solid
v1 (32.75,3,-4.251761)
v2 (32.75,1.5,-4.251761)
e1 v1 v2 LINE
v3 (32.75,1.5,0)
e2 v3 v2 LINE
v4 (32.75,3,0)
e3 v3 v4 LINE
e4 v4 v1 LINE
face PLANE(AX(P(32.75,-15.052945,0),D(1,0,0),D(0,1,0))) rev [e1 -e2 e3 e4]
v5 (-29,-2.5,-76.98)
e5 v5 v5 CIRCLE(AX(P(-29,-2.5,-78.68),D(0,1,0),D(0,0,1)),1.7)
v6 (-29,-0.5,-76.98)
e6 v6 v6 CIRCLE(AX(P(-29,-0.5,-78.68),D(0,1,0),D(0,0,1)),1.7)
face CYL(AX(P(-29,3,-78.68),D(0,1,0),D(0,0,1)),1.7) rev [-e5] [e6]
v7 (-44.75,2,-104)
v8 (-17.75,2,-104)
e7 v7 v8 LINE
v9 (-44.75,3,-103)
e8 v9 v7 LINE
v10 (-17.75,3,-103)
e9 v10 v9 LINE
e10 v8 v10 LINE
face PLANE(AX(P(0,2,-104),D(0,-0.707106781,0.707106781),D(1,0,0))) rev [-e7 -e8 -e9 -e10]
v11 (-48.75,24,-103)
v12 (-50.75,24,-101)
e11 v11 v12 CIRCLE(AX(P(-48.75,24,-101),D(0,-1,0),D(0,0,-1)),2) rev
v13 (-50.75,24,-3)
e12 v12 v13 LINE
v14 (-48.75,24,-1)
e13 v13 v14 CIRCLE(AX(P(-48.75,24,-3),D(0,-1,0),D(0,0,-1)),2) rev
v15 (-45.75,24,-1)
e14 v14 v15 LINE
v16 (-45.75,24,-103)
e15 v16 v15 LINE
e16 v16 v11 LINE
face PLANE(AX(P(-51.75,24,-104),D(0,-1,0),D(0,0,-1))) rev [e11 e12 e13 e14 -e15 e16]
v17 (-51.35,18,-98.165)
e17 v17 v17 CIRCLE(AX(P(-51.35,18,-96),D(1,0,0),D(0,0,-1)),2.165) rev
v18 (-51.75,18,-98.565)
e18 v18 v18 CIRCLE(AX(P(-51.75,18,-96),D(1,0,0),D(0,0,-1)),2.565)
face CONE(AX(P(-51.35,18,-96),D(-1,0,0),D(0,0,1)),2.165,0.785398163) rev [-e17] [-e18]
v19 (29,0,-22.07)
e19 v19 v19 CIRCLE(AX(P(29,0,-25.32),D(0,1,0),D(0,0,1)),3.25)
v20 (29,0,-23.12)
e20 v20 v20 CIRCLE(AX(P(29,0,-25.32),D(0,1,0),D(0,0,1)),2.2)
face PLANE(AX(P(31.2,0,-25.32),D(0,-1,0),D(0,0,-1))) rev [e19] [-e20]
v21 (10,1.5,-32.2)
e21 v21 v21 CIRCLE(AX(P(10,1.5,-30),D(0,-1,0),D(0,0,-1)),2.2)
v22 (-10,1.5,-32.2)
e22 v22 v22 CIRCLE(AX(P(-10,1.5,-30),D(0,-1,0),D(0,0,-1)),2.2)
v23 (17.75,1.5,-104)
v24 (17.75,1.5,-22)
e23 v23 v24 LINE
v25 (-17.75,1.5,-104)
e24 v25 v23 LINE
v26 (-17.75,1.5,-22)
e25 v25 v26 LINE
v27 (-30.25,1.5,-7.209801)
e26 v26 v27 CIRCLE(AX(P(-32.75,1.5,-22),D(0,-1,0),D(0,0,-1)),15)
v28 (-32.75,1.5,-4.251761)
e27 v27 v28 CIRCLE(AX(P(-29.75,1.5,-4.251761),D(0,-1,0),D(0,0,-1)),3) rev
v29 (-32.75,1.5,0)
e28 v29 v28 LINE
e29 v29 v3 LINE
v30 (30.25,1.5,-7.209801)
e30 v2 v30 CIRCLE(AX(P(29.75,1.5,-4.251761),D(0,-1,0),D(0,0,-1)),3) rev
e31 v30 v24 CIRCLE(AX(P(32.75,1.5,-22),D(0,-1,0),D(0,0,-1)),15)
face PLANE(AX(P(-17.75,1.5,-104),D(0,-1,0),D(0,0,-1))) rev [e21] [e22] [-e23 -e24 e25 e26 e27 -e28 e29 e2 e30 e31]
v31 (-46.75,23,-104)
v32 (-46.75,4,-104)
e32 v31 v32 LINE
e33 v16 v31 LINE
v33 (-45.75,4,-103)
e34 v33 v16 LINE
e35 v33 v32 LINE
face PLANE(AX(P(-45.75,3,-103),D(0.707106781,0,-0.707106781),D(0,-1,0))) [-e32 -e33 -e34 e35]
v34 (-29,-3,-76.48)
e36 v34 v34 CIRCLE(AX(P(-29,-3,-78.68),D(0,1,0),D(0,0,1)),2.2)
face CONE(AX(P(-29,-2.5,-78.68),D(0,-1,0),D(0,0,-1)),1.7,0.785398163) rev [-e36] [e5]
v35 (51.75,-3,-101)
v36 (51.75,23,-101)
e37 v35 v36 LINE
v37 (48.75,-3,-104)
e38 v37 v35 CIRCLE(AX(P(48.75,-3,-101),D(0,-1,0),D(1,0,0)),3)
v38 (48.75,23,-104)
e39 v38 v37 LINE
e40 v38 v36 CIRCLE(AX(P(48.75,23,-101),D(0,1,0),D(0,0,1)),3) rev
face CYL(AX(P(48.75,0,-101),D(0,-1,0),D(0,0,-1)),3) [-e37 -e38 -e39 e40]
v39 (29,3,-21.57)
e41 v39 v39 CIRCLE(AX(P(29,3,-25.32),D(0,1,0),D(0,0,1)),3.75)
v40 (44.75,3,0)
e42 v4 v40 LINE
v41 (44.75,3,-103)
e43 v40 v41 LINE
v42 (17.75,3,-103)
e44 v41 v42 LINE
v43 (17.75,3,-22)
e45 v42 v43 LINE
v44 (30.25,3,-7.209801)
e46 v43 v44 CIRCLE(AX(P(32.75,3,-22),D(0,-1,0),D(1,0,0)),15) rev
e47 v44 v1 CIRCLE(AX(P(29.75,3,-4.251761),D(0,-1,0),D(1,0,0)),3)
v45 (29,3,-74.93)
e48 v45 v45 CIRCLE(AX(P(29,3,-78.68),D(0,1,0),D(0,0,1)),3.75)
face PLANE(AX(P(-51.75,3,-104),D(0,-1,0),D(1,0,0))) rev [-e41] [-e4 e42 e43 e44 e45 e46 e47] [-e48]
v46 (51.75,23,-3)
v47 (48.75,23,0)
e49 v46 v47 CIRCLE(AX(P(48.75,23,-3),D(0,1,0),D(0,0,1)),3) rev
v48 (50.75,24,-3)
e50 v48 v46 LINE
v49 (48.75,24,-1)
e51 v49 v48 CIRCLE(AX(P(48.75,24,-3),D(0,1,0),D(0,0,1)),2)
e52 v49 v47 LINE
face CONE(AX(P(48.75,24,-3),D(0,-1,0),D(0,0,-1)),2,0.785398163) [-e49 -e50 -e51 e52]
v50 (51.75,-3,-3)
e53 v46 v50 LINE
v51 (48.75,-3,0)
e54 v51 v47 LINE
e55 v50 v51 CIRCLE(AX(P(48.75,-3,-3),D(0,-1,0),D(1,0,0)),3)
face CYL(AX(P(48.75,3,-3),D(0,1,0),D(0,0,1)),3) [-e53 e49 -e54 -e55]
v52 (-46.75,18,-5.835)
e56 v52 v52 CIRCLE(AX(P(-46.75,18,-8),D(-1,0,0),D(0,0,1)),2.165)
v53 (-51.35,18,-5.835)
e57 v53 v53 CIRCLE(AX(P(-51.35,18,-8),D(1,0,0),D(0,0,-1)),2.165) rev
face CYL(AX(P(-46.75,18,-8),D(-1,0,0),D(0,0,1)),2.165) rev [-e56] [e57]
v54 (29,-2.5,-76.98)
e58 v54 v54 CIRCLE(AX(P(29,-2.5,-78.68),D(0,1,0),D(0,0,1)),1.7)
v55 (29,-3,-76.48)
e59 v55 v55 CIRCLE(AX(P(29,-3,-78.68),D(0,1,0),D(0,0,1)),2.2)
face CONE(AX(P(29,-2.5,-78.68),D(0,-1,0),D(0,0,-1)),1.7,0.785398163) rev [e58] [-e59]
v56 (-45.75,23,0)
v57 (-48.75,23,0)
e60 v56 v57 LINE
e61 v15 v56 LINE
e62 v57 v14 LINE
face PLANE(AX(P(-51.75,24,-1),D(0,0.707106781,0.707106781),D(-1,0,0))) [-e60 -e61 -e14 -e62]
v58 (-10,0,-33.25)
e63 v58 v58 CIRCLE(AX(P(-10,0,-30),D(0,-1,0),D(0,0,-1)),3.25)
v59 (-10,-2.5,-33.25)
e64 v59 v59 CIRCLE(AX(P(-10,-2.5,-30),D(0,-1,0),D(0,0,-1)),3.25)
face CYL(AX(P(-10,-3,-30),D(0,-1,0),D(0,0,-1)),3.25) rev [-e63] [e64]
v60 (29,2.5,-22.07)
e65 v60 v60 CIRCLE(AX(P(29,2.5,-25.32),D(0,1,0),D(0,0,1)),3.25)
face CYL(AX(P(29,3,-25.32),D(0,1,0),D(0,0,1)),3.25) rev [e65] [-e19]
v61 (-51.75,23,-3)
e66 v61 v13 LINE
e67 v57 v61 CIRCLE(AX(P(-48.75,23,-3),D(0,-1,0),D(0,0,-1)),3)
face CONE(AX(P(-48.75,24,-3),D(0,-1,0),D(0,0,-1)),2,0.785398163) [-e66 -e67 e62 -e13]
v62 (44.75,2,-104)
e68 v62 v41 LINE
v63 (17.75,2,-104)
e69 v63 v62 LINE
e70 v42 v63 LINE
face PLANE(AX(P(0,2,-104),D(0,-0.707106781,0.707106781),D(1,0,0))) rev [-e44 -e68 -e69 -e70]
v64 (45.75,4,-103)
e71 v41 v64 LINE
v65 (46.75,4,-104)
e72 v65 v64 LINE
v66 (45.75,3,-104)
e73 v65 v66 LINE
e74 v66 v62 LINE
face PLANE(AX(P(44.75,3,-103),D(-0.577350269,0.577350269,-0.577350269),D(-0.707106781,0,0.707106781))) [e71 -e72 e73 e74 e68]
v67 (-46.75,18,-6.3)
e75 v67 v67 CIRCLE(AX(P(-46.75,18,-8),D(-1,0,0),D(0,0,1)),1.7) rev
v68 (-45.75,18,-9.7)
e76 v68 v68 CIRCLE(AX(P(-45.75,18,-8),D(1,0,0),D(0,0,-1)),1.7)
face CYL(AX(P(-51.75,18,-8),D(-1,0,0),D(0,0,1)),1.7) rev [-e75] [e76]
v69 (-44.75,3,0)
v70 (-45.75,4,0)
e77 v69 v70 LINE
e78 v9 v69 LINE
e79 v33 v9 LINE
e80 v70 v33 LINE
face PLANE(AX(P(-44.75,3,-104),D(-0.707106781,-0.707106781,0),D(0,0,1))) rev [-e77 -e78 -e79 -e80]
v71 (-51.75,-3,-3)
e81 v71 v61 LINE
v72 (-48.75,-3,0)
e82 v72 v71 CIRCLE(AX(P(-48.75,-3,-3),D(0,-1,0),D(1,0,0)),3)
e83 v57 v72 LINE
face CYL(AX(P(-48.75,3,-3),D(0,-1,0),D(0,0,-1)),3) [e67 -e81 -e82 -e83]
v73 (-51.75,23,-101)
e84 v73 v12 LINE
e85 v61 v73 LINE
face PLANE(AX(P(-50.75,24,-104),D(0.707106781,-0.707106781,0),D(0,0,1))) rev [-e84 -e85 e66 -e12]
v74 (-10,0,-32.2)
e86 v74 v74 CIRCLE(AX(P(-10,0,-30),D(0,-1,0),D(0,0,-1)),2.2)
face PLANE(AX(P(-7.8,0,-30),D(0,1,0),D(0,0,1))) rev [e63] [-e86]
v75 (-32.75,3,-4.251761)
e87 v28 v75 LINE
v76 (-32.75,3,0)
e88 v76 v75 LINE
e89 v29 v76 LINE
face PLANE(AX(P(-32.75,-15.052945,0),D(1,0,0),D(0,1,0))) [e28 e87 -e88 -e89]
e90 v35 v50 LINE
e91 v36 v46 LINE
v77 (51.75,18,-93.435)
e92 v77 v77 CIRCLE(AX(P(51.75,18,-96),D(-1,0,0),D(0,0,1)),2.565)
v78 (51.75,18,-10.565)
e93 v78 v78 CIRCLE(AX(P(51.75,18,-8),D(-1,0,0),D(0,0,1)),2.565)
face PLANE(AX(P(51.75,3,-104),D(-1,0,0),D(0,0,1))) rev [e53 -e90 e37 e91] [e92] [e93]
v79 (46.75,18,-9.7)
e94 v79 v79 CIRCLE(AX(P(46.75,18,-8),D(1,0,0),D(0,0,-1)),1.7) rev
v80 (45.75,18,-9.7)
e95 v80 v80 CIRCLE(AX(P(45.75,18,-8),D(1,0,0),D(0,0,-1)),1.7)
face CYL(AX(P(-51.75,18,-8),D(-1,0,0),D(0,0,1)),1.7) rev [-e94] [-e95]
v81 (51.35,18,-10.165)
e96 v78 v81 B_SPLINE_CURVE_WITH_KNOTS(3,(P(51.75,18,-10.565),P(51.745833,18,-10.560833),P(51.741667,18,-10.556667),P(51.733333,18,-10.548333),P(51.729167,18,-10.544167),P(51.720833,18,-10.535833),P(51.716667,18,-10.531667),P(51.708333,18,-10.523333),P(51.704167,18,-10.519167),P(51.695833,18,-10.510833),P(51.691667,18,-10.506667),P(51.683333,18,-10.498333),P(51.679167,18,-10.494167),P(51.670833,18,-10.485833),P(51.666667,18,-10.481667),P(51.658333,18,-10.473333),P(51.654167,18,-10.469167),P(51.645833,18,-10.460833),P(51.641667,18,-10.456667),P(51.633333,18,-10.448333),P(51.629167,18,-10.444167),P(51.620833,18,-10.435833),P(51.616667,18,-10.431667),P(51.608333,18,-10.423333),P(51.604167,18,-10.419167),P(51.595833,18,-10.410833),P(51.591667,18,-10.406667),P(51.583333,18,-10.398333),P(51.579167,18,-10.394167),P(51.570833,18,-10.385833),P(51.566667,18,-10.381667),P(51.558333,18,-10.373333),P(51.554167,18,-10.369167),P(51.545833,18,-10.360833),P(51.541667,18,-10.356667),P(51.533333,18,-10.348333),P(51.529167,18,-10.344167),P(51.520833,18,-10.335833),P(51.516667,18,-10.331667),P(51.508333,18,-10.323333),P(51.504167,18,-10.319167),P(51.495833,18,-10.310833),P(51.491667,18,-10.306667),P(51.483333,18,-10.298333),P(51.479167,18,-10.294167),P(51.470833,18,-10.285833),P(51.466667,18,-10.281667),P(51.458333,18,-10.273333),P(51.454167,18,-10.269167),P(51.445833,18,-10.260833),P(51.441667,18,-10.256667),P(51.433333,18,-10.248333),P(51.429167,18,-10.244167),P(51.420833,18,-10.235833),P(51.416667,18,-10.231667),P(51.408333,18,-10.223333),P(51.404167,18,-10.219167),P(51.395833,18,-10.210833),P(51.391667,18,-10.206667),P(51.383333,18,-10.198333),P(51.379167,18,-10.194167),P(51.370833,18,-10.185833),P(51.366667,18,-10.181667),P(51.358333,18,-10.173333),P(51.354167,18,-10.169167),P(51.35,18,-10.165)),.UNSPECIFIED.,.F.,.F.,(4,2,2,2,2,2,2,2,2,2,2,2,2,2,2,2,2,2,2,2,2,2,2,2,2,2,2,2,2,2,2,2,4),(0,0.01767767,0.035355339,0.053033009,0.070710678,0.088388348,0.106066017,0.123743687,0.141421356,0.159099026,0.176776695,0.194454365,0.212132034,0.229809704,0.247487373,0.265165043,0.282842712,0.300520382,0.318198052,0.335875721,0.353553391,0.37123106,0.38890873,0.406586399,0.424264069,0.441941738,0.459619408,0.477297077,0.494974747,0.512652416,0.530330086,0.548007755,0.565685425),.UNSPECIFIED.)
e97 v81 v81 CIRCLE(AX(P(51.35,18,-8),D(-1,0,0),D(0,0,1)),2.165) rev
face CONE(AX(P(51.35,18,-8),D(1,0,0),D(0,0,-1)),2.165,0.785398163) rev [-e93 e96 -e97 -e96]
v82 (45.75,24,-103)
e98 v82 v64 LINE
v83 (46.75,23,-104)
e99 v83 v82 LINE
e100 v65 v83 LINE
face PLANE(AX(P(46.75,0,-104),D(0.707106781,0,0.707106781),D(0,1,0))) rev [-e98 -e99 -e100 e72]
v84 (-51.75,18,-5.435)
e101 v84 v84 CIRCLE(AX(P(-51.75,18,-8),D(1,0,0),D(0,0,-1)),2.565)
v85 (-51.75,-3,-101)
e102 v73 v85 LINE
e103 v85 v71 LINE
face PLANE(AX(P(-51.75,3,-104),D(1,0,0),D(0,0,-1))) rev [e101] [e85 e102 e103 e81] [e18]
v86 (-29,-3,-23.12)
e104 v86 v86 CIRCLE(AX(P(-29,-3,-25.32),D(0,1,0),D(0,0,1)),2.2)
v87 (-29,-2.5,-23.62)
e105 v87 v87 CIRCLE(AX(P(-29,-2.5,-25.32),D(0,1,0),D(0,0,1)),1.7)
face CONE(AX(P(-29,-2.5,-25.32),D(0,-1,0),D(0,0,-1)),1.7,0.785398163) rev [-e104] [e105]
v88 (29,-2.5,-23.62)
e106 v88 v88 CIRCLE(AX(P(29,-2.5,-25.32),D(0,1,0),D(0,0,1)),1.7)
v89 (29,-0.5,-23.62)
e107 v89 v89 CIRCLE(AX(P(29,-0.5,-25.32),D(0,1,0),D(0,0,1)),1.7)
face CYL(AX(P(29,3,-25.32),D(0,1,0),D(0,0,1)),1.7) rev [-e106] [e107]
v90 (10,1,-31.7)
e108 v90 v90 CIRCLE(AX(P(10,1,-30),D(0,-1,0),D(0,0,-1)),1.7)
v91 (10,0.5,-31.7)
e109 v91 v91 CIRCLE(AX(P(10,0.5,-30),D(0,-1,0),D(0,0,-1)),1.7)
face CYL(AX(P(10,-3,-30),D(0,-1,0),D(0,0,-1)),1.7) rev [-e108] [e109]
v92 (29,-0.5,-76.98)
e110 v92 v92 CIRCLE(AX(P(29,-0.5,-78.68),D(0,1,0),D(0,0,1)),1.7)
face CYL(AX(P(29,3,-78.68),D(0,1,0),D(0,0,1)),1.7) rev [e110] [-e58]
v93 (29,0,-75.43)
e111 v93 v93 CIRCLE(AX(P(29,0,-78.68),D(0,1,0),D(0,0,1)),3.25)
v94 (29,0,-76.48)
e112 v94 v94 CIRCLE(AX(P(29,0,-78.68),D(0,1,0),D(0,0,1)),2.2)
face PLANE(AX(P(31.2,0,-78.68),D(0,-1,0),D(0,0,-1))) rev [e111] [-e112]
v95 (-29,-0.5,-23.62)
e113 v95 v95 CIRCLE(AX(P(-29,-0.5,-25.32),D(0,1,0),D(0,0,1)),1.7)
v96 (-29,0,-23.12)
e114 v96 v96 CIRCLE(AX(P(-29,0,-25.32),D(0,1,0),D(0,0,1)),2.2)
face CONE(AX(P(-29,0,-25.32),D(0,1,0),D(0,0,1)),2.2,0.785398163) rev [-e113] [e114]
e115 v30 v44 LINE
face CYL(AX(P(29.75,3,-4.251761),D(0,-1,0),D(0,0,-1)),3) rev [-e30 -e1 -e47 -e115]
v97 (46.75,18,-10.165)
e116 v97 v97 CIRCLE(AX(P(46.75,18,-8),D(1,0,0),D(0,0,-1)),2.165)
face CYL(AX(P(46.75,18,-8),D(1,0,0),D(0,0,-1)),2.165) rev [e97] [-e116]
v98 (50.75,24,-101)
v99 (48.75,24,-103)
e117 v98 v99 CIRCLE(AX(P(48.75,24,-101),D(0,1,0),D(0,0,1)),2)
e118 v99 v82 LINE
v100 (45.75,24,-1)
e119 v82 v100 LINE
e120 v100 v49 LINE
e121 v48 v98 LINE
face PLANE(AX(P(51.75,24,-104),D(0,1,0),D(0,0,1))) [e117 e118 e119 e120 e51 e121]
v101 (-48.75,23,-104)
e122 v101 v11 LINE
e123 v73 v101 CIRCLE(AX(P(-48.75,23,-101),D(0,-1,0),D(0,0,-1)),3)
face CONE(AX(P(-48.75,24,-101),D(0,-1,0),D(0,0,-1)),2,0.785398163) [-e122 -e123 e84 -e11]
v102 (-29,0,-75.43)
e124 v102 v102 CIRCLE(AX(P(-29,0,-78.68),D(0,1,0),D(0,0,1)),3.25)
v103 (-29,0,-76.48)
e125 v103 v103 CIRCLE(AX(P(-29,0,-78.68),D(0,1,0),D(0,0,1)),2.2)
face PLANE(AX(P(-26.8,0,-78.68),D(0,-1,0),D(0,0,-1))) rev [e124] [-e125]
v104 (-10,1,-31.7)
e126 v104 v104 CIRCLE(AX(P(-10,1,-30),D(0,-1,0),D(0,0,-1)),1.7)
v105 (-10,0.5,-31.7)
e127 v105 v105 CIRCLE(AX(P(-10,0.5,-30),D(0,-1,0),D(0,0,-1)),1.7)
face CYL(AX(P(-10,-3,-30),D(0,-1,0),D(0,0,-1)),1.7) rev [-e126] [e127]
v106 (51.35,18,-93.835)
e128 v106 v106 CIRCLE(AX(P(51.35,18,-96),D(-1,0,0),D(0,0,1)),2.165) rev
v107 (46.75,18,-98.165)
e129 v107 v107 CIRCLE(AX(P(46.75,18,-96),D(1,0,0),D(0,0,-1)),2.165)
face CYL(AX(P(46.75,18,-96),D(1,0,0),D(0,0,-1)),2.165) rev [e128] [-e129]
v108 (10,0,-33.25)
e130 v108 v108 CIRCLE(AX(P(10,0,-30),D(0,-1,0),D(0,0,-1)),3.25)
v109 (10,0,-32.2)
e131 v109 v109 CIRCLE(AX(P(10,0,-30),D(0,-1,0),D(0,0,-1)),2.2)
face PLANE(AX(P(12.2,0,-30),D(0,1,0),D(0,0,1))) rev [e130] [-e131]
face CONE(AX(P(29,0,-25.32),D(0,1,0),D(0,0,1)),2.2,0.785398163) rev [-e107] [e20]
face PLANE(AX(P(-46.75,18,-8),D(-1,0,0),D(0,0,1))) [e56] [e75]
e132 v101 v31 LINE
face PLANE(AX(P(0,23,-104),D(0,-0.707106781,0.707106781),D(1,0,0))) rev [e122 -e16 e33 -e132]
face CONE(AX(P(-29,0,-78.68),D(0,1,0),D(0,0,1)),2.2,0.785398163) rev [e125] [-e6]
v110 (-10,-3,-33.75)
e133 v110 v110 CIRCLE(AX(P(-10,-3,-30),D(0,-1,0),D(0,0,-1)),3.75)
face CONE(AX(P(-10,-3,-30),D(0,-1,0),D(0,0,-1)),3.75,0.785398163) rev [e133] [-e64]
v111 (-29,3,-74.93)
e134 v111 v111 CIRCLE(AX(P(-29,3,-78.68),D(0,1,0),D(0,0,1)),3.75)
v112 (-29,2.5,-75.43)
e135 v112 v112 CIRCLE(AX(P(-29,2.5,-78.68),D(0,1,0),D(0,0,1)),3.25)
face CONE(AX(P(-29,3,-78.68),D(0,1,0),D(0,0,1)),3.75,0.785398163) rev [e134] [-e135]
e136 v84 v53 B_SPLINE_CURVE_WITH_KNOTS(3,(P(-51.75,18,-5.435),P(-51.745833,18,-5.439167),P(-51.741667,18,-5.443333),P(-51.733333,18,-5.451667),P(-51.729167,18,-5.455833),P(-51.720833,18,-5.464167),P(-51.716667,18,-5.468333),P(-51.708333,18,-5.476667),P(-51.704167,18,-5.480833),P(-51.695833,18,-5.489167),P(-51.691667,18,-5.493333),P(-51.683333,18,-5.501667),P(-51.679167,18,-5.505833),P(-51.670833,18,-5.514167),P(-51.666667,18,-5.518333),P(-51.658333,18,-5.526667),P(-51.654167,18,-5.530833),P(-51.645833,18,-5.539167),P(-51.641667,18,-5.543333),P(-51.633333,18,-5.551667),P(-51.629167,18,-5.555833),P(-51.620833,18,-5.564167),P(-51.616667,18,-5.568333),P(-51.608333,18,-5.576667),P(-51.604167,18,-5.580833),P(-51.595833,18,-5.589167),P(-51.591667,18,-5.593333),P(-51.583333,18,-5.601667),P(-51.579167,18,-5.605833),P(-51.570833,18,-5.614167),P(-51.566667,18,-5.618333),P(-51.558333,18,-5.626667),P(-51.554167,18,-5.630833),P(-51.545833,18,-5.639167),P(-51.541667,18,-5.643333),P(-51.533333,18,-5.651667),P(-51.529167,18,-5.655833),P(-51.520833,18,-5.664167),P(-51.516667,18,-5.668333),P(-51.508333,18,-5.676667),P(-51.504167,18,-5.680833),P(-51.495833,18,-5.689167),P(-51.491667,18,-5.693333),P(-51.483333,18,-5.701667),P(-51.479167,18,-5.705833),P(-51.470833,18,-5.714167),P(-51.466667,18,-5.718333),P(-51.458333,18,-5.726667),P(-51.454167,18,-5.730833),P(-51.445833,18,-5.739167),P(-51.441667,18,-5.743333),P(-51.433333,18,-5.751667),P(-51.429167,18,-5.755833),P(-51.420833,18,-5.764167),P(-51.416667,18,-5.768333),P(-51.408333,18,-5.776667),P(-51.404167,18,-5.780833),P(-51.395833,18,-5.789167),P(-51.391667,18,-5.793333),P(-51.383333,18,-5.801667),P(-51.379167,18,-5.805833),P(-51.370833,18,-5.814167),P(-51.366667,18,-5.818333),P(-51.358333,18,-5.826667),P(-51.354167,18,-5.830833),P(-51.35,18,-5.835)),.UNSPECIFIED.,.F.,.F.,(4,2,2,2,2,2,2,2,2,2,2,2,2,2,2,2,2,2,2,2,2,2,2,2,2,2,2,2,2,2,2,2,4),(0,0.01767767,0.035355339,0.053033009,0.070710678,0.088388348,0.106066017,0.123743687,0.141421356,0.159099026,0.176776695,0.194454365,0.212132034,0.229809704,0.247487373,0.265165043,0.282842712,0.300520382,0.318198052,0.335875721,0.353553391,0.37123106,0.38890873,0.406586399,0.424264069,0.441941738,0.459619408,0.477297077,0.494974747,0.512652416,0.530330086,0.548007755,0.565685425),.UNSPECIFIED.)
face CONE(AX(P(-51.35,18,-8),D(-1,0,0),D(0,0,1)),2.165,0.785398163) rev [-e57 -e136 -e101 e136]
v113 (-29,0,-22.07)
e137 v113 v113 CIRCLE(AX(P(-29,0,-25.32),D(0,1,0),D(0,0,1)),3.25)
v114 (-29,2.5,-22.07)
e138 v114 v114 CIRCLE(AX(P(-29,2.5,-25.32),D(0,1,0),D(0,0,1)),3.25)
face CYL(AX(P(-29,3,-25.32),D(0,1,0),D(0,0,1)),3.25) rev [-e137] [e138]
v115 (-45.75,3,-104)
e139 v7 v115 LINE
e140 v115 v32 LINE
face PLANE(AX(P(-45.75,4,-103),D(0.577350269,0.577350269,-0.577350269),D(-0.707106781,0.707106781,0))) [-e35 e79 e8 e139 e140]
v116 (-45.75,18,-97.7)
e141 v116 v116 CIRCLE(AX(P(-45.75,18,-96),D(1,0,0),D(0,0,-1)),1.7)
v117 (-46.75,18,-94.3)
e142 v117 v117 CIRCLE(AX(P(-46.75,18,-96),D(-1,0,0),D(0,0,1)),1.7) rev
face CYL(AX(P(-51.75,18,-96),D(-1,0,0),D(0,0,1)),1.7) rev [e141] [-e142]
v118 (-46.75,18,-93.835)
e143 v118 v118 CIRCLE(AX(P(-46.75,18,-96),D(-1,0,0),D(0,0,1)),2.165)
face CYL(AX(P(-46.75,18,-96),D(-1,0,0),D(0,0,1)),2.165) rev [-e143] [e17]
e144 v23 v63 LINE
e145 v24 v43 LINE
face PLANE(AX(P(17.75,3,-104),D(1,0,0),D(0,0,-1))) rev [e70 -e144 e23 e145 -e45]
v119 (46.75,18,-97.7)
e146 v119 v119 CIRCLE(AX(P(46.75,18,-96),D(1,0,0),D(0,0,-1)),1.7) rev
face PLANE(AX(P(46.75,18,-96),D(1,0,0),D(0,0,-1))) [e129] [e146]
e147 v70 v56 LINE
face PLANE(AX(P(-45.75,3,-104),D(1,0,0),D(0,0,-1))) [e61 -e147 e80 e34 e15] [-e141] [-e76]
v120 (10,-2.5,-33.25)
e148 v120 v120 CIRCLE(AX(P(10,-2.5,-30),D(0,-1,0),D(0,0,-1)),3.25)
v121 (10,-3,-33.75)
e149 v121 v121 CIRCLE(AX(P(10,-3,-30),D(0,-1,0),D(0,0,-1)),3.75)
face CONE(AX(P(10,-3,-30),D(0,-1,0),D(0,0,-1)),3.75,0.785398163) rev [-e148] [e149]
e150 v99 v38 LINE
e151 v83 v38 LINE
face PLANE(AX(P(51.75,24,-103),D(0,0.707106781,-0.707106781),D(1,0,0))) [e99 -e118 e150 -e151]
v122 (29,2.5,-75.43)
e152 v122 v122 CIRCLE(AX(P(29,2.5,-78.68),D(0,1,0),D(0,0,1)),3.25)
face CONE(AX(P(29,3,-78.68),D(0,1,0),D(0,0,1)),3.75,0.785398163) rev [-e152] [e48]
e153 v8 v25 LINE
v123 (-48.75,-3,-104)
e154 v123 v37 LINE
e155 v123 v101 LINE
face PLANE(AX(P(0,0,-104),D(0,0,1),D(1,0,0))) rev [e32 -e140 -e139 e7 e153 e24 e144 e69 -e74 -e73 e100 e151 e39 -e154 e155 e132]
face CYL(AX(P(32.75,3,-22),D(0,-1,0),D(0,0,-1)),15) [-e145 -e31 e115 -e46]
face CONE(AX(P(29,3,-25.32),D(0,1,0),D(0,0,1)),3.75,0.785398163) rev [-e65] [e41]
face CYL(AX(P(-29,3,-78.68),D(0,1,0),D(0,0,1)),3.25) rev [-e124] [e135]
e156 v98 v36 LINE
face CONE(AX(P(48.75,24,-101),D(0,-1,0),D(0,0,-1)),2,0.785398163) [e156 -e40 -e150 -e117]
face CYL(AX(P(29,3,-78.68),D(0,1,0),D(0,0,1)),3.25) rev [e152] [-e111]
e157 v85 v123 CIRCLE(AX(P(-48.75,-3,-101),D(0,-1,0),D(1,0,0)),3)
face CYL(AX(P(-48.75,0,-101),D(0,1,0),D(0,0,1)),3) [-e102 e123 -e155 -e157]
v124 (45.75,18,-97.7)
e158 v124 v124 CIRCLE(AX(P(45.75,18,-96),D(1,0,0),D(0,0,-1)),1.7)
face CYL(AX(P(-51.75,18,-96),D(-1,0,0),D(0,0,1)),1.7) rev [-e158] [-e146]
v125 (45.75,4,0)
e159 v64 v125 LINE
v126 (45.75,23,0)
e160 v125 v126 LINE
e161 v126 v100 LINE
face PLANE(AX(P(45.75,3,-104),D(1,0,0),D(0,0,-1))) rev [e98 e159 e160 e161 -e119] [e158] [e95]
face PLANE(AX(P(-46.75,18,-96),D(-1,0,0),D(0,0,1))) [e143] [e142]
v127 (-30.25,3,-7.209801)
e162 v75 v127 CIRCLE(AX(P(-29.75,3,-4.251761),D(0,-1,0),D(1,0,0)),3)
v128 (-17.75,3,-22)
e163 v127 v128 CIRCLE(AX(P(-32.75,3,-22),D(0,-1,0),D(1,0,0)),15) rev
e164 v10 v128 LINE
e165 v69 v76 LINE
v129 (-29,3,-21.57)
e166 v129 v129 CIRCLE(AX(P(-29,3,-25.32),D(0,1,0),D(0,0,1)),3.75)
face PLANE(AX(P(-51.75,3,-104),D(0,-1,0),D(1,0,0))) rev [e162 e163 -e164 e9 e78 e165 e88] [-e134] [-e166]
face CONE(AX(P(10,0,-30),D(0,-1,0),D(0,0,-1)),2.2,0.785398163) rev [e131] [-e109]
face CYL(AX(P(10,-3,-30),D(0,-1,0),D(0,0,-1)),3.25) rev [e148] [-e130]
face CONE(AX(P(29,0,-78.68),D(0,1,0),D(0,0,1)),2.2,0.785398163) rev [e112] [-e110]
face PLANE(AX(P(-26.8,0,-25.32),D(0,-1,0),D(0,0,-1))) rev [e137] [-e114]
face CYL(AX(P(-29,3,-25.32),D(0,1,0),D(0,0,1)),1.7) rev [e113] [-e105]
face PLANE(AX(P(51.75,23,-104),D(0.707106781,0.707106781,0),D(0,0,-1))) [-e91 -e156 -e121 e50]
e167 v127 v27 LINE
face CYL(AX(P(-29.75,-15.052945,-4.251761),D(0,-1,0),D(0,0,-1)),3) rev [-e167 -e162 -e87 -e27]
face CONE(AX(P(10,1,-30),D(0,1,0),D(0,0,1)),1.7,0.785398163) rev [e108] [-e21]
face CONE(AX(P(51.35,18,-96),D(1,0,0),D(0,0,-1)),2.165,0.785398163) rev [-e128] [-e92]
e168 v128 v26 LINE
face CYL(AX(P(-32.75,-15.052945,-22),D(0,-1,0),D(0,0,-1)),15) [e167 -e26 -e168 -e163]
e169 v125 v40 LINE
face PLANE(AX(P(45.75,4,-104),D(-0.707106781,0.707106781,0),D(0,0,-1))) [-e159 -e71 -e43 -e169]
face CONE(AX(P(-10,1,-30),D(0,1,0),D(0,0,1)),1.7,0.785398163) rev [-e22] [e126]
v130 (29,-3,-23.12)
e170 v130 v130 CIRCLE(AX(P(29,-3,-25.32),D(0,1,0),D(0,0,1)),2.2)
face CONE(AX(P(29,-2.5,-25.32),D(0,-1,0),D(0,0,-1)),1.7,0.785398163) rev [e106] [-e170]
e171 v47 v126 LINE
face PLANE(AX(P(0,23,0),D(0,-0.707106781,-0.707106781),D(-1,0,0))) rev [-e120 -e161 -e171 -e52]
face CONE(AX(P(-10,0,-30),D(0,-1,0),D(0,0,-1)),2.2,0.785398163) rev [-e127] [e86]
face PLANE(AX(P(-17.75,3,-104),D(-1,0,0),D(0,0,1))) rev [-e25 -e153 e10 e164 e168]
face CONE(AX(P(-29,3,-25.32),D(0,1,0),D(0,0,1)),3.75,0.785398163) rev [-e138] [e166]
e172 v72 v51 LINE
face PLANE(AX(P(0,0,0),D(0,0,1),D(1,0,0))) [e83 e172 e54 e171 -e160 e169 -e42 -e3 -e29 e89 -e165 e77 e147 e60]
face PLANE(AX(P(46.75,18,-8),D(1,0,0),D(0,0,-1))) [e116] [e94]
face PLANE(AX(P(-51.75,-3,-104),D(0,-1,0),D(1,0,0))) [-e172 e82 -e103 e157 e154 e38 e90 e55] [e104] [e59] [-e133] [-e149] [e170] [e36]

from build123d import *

# Parameters (mm, degrees)
SKETCH1_W                     = 6
SKETCH1_H                     = 21
BOSS_EXTRUDE1_DEPTH           = 104
SKETCH2_W                     = 35.5
SKETCH2_H                     = 1.5
CUT_EXTRUDE1_DEPTH            = 119.61729427
CBORE_FOR_M3_SHCS1_AT_2_COUNT = 2
CBORE_FOR_M3_SHCS1_AT_2_PITCH = 20
CBORE_FOR_M3_SHCS2_AT_2_COUNT = 2
CBORE_FOR_M3_SHCS2_AT_2_PITCH = 58
CBORE_FOR_M3_SHCS2_AT_3_COUNT = 2
CBORE_FOR_M3_SHCS2_AT_3_PITCH = 78.811735167
CBORE_FOR_M3_SHCS2_AT_4_COUNT = 2
CBORE_FOR_M3_SHCS2_AT_4_PITCH = 53.36
M3_CLEARANCE_HOLE1_D          = 3.4
SKETCH25_R                    = 2.165
CUT_EXTRUDE7_DEPTH            = 5
CUT_EXTRUDE8_START            = -5
SKETCH26_R                    = 2.165
CUT_EXTRUDE8_DEPTH            = 5
SKETCH28_W                    = 15
SKETCH28_H                    = 7
CUT_EXTRUDE10_DEPTH           = 1.5
FILLET3_R                     = 15
FILLET2_R                     = 3
CHAMFER1_SIZE                 = 1
CHAMFER2_SIZE                 = 0.4


with BuildPart() as part:
    # Sketch1 → Boss-Extrude1 (new body)
    with BuildSketch(Plane.XY):
        with Locations((-48.75, 13.5)):
            Rectangle(SKETCH1_W, SKETCH1_H)
        Polygon((-45.75, 3), (-51.75, 3), (-51.75, -3), (51.75, -3), (51.75, 3), (45.75, 3), align=None)
        with Locations((48.75, 13.5)):
            Rectangle(SKETCH1_W, SKETCH1_H)
    extrude(amount=-BOSS_EXTRUDE1_DEPTH)

    # Sketch2 → Cut-Extrude1 (cut, through all)
    with BuildSketch(Plane.XY):
        with Locations((0, 2.25)):
            Rectangle(SKETCH2_W, SKETCH2_H)
    extrude(amount=-CUT_EXTRUDE1_DEPTH, mode=Mode.SUBTRACT)

    # Sketch7 → CBORE for M3 SHCS1 (revolve, cut)
    with BuildSketch(Plane(origin=(-10, -3, -30), x_dir=(0, 0, -1), z_dir=(1, 0, 0))):
        Polygon((0, 0), (0, 4.5), (2.2, 4.5), (1.7, 4), (1.7, 3.5), (2.2, 3), (3.25, 3), (3.25, 0.5), (3.75, 0), align=None)
    cbore_for_m3_shcs1 = revolve(axis=Axis((-10, -9.35, -30), (0, 1, 0)), mode=Mode.SUBTRACT)

    # CBORE for M3 SHCS1 at 2: CBORE for M3 SHCS1 ×2
    with Locations(*[(i * CBORE_FOR_M3_SHCS1_AT_2_PITCH, 0, 0) for i in range(1, CBORE_FOR_M3_SHCS1_AT_2_COUNT)]):
        add(cbore_for_m3_shcs1, mode=Mode.SUBTRACT)

    # Sketch19 → CBORE for M3 SHCS2 (revolve, cut)
    with BuildSketch(Plane(origin=(-29, 3, -25.32), x_dir=(0, 0, 1), z_dir=(1, 0, 0))):
        Polygon((0, 0), (0, 6), (2.2, 6), (1.7, 5.5), (1.7, 3.5), (2.2, 3), (3.25, 3), (3.25, 0.5), (3.75, 0), align=None)
    cbore_for_m3_shcs2 = revolve(axis=Axis((-29, 9.35, -25.32), (0, -1, 0)), mode=Mode.SUBTRACT)

    # CBORE for M3 SHCS2 at 2: CBORE for M3 SHCS2 ×2
    with Locations(*[(i * CBORE_FOR_M3_SHCS2_AT_2_PITCH, 0, 0) for i in range(1, CBORE_FOR_M3_SHCS2_AT_2_COUNT)]):
        add(cbore_for_m3_shcs2, mode=Mode.SUBTRACT)

    # CBORE for M3 SHCS2 at 3: CBORE for M3 SHCS2 ×2
    with Locations(*[Vector(0.7359310117618296, 0, -0.6770565308208834) * (i * CBORE_FOR_M3_SHCS2_AT_3_PITCH) for i in range(1, CBORE_FOR_M3_SHCS2_AT_3_COUNT)]):
        add(cbore_for_m3_shcs2, mode=Mode.SUBTRACT)

    # CBORE for M3 SHCS2 at 4: CBORE for M3 SHCS2 ×2
    with Locations(*[(0, 0, -i * CBORE_FOR_M3_SHCS2_AT_4_PITCH) for i in range(1, CBORE_FOR_M3_SHCS2_AT_4_COUNT)]):
        add(cbore_for_m3_shcs2, mode=Mode.SUBTRACT)

    # M3 Clearance Hole1 (through all)
    with Locations(Plane.ZY.offset(51.75)):
        with Locations((-96, 18), (-8, 18)):
            Hole(M3_CLEARANCE_HOLE1_D / 2)

    # Sketch25 → Cut-Extrude7 (cut)
    with BuildSketch(Plane.ZY.offset(51.75)):
        with Locations((-96, 18)):
            Circle(SKETCH25_R)
        with Locations((-8, 18)):
            Circle(SKETCH25_R)
    extrude(amount=-CUT_EXTRUDE7_DEPTH, mode=Mode.SUBTRACT)

    # Sketch26 → Cut-Extrude8 (cut)
    with BuildSketch(Plane(origin=(51.75, 0, 0), x_dir=(0, 0, -1), z_dir=(1, 0, 0)).offset(CUT_EXTRUDE8_START)):
        with Locations(Location((8, 18, 0), (0, 0, 180))):
            Circle(SKETCH26_R)
        with Locations(Location((96, 18, 0), (0, 0, 180))):
            Circle(SKETCH26_R)
    extrude(amount=CUT_EXTRUDE8_DEPTH, mode=Mode.SUBTRACT)

    # Sketch28 → Cut-Extrude10 (cut)
    with BuildSketch(Plane(origin=(0, 3, 0), x_dir=(1, 0, 0), z_dir=(0, 1, 0))):
        with Locations((-25.25, 3.5)):
            Rectangle(SKETCH28_W, SKETCH28_H)
        with Locations((25.25, 3.5)):
            Rectangle(SKETCH28_W, SKETCH28_H)
    extrude(amount=-CUT_EXTRUDE10_DEPTH, mode=Mode.SUBTRACT)

    # Fillet3
    fillet3_edges = [part.edges().sort_by_distance(p)[0] for p in [
        (17.75, 2.25, -7),
        (-17.75, 2.25, -7),
    ]]
    fillet(fillet3_edges, radius=FILLET3_R - 0.0001)  # a hair under: the kernel refuses the full size

    # Fillet2
    fillet2_edges = [part.edges().sort_by_distance(p)[0] for p in [
        (-51.75, 10.5, -104),
        (-32.75, 2.25, -7),
        (32.75, 2.25, -7),
        (51.75, 10.5, -104),
        (51.75, 10.5, 0),
        (-51.75, 10.5, 0),
    ]]
    fillet(fillet2_edges, radius=FILLET2_R)

    # Chamfer1
    chamfer1_edges = [part.edges().sort_by_distance(p)[0] for p in [
        (45.75, 3, -52),
        (-31.75, 3, -104),
        (47.25, 24, -104),
        (-47.25, 24, -104),
        (-47.25, 24, 0),
        (-51.75, 24, -52),
        (-50.871320344, 24, -0.878679656),
        (-50.871320344, 24, -103.121320344),
        (51.75, 24, -52),
        (47.25, 24, 0),
        (50.871320344, 24, -0.878679656),
        (50.871320344, 24, -103.121320344),
        (45.75, 13.5, -104),
        (31.75, 3, -104),
        (-45.75, 3, -52),
        (-45.75, 13.5, -104),
    ]]
    chamfer(chamfer1_edges, length=CHAMFER1_SIZE)

    # Chamfer2
    chamfer2_edges = [part.edges().sort_by_distance(p)[0] for p in [
        (-51.75, 18, -98.165),
        (-51.75, 18, -10.165),
        (51.75, 18, -10.165),
        (51.75, 18, -98.165),
    ]]
    chamfer(chamfer2_edges, length=CHAMFER2_SIZE)


solid = part.part
